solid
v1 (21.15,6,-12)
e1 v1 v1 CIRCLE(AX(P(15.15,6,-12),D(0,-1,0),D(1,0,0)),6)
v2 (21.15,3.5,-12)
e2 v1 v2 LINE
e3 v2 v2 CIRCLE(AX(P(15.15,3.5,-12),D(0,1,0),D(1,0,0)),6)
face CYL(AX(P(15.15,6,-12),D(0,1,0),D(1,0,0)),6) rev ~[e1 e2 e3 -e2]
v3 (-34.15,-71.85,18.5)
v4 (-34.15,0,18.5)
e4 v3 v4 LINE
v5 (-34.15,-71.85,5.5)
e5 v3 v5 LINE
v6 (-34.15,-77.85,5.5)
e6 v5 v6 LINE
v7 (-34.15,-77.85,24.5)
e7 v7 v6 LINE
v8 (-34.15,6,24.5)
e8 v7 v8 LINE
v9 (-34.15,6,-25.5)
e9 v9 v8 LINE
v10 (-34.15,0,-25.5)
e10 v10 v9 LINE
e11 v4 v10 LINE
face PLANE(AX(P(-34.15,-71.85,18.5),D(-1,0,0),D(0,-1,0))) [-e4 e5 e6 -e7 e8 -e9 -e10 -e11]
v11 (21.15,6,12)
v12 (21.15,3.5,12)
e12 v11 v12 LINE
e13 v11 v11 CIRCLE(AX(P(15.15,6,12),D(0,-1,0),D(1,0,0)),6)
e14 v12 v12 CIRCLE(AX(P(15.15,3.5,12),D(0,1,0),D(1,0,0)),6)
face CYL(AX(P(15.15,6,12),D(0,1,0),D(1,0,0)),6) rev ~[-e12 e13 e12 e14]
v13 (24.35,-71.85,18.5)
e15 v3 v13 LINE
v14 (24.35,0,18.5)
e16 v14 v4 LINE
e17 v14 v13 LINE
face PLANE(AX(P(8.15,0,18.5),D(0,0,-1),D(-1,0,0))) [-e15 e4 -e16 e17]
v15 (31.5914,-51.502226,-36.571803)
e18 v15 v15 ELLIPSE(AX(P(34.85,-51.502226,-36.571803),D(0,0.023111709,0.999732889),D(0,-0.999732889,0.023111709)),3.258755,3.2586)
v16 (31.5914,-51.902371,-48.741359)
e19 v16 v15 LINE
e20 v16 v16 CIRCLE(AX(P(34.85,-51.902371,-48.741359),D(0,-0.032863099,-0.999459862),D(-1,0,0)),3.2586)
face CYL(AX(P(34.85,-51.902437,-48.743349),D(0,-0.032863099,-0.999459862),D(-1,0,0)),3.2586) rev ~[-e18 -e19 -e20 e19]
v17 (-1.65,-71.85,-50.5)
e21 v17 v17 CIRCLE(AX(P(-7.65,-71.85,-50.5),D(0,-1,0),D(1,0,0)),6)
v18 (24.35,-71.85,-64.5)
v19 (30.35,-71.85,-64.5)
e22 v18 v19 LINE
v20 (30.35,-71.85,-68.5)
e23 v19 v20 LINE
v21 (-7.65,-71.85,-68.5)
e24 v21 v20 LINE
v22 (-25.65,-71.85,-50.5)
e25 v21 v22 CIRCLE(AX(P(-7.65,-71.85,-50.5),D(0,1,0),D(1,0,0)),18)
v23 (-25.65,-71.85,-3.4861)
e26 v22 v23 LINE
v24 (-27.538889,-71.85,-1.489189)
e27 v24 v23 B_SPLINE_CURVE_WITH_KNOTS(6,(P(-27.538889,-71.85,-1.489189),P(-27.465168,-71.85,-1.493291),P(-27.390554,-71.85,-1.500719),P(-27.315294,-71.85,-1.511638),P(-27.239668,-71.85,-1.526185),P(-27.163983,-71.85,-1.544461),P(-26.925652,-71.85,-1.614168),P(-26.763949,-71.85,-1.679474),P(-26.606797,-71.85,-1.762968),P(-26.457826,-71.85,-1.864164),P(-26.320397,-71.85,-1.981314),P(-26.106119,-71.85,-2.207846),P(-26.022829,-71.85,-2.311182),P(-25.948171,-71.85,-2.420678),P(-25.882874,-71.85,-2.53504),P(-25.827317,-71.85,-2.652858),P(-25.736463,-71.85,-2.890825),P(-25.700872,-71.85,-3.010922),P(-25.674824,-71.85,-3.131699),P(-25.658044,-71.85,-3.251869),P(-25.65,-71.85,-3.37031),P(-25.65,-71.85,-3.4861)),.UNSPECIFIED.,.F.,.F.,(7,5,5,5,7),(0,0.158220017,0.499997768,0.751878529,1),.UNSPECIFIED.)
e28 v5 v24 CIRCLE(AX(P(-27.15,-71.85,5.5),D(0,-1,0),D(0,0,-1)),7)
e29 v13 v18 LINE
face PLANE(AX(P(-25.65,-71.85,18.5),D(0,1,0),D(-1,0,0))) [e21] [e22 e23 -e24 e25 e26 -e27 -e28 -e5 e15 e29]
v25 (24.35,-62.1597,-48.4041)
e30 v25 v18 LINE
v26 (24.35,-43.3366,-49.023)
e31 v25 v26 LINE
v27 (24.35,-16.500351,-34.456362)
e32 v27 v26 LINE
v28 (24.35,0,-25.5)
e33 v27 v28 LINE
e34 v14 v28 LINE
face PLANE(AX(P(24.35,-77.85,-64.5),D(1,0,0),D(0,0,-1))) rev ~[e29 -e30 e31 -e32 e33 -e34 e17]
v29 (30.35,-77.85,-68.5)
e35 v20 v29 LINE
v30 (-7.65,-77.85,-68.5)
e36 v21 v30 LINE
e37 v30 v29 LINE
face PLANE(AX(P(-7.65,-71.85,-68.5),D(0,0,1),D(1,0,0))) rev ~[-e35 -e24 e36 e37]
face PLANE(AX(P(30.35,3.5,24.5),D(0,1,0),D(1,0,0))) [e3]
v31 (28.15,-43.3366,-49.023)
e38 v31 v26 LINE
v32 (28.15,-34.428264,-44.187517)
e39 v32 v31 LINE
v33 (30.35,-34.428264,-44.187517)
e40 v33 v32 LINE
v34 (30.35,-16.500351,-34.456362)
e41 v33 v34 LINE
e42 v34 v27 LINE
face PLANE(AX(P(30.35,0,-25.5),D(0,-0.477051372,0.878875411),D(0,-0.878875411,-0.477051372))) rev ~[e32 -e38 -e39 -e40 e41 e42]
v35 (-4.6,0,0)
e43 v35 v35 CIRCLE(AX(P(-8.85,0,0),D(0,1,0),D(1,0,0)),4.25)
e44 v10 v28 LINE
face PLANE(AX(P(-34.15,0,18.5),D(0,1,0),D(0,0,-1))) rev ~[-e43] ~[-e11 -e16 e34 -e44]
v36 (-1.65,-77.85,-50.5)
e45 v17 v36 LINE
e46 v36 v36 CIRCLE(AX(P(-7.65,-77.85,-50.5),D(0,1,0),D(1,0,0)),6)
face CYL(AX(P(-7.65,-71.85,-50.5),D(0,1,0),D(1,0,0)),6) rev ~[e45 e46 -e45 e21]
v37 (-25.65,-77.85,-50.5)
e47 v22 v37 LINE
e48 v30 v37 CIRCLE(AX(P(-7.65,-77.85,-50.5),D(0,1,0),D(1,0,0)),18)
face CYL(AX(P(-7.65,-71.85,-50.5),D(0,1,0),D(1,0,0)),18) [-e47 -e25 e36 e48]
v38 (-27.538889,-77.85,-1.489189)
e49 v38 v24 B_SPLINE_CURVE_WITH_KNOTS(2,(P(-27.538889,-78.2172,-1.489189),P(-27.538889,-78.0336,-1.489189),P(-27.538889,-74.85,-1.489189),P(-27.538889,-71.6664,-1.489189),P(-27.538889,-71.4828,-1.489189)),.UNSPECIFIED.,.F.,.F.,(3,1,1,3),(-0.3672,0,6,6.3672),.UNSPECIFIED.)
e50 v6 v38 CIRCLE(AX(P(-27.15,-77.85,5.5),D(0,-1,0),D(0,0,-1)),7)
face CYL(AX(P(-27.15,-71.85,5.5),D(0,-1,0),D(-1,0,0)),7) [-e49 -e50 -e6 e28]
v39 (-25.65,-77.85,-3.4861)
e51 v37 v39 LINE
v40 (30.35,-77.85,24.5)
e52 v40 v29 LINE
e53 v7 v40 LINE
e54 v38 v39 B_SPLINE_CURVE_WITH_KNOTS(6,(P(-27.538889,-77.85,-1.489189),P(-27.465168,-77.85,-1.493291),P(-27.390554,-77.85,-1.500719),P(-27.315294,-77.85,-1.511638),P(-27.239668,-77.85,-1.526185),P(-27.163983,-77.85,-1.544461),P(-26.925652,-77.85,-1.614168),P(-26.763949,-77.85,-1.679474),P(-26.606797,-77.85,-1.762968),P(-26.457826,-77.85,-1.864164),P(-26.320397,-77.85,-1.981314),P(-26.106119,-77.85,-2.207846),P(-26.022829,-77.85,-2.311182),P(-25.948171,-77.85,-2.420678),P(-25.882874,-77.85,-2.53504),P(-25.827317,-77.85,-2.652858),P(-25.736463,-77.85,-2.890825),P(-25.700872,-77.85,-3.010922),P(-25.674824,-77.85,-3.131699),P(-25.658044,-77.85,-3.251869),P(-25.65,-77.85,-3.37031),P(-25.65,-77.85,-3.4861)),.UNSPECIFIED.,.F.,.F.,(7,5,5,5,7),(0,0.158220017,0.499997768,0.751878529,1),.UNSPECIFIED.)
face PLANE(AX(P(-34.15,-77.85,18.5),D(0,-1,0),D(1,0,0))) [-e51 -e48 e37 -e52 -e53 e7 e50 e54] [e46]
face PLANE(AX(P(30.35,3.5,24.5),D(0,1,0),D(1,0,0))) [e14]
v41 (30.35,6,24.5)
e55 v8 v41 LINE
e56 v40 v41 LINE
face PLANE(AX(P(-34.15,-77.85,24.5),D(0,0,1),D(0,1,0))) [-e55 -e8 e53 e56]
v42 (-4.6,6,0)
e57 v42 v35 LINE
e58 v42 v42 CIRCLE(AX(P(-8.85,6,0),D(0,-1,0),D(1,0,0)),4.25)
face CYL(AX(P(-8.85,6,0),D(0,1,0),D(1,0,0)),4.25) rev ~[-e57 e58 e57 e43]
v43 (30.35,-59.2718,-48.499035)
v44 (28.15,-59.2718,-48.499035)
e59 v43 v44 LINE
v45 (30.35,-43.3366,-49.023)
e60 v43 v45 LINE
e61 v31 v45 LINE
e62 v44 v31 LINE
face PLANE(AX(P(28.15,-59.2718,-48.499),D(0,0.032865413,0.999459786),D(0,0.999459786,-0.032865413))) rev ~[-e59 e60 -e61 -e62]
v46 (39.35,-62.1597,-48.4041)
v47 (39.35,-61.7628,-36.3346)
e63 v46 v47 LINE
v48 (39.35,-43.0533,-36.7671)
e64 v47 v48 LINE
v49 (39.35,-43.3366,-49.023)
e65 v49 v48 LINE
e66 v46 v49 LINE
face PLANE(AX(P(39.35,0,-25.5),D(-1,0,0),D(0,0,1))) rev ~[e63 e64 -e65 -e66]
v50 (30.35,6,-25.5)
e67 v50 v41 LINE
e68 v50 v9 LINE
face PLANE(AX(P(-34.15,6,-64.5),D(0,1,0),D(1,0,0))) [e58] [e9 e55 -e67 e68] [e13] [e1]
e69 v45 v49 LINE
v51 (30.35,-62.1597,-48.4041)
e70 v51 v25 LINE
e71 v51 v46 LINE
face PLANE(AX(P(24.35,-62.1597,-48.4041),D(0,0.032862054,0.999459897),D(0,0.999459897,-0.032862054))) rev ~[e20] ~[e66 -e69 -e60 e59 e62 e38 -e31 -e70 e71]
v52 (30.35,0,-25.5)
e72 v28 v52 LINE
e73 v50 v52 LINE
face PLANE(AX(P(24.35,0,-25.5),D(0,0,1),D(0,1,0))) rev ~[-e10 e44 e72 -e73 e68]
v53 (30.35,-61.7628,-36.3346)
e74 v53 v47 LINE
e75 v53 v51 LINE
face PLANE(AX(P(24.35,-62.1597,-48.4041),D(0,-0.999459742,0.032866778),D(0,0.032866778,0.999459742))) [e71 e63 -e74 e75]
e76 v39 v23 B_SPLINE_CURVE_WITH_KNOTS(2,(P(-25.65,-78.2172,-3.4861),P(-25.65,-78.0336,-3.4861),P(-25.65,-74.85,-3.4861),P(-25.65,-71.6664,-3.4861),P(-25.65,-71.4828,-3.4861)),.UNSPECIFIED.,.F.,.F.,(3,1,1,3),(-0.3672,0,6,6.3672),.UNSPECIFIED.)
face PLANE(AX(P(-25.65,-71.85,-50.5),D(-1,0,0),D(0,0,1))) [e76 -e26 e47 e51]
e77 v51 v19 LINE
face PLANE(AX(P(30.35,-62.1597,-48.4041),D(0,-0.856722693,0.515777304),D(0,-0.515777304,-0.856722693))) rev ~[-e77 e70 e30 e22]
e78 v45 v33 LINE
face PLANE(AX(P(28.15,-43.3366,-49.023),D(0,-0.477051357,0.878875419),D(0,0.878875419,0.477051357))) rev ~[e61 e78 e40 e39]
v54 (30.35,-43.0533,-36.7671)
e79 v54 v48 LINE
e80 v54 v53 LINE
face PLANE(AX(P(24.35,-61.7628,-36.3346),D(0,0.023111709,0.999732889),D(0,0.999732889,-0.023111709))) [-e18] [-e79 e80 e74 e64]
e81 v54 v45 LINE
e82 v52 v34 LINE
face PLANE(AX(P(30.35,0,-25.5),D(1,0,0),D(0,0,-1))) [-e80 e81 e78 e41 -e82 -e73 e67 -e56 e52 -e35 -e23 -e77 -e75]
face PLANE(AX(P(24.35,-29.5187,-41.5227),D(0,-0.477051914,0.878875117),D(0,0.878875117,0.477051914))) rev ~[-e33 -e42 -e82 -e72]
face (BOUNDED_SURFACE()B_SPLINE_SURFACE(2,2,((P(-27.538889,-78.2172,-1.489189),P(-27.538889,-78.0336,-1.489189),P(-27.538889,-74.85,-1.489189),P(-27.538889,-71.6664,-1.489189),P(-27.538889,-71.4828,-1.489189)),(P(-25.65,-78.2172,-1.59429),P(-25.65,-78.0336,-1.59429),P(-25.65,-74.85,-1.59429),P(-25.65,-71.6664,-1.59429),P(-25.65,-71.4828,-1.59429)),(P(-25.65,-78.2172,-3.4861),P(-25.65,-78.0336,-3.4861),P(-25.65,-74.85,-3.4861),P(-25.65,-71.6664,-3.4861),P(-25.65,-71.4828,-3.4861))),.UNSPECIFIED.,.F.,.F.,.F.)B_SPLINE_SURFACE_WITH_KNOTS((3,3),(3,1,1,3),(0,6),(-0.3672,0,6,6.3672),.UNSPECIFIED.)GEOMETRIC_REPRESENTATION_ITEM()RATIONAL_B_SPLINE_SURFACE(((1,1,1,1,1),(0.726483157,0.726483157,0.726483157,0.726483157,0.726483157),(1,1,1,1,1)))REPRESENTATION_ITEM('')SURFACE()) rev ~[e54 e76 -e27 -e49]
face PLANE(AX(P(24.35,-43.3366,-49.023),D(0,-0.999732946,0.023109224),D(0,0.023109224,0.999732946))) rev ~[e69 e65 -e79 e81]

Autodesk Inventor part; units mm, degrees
ref_plane "YZ Plane" through (0, 0, 0) normal (1, 0, 0) x (0, 1, 0)
ref_plane "XZ Plane" through (0, 0, 0) normal (0, 1, 0) x (-1, 0, 0)
ref_plane "XY Plane" through (0, 0, 0) normal (0, 0, 1) x (1, 0, 0)
sketch "Sketch1" plane through (0, 0, 0) normal (0, 1, 0) x (-1, 0, 0)
  line L0 (0, -25.5) -> (-34.15, -25.5)
  line L1 (-34.15, -25.5) -> (-34.15, 0)
  line L2 (-34.15, 0) -> (-34.15, 25.5)
  line L3 (-34.15, 25.5) -> (0, 25.5)
  line L4 (0, 25.5) -> (34.15, 25.5)
  line L5 (34.15, 25.5) -> (34.15, 0)
  line L6 (34.15, 0) -> (34.15, -25.5)
  line L7 (34.15, -25.5) -> (0, -25.5)
  point P0 (0, 0)
extrude "Extrusion1" add sketch "Sketch1" along normal blind 7
sketch "Sketch3" plane through (-34.15, 0, 25.5) normal (0, 0, 1) x (1, 0, 0)
  line L0 (0, 0) -> (0, -78.85)
  point P0 (34.15, 0)
  dimension "d7" = 78.85
sketch "Sketch4" plane through (-34.15, 0, -25.5) normal (-1, 0, 0) x (0, 0, 1)
  line L0 (51, 0) -> (51, -78.85)
  line L1 (51, -78.85) -> (-39, -78.85)
  line L2 (-39, -78.85) -> (-39, -71.85)
  line L3 (0, 0) -> (-39, -71.85)
  line L4 (0, 0) -> (51, 0)
  point P0 (25.5, 0)
  dimension "d10" = 90
  dimension "d11" = 7
extrude "Extrusion2" add sketch "Sketch4" against normal blind 7
sketch "Sketch7" plane through (-27.15, 0, -25.5) normal (1, 0, 0) x (0, 0, -1)
  line L0 (-51, -78.85) -> (39, -78.85) projected
  line L1 (-51, -78.85) -> (39, -78.85)
  line L2 (39, -78.85) -> (39, -71.85) projected
  line L3 (39, -78.85) -> (39, -71.85)
  line L4 (39, -71.85) -> (-51, -71.85)
  line L5 (-51, 0) -> (-51, -78.85) projected
  line L6 (-51, -78.85) -> (-51, -71.85)
  point P0 (-25.5, 0)
sketch "Sketch8" plane through (0, 0, 0) normal (0, -1, 0) x (1, 0, 0)
  circle A0 centre (8.15, 0) radius 5 projected
  line L0 (8.15, 18.5) -> (34.15, 18.5)
  line L1 (34.15, 25.5) -> (34.15, -25.5) projected
  line L2 (8.15, 25.5) -> (34.15, 25.5)
  line L3 (8.15, 25.5) -> (-27.15, 25.5)
  line L4 (-27.15, 25.5) -> (-27.15, -25.5) projected
  line L5 (8.15, 18.5) -> (-27.15, 18.5)
  line L6 (34.15, 25.5) -> (34.15, 18.5)
  line L7 (-27.15, 25.5) -> (-27.15, 18.5)
  point P0 (0, 0)
extrude "Extrusion6" add sketch "Sketch7" along normal blind 58.5
extrude "Extrusion7" add sketch "Sketch8" along normal blind 78.75 contours L5 L4 L3 L2 L1 L0
sketch "Sketch9" plane through (31.35, 0, -25.5) normal (1, 0, 0) x (0, 0, -1)
  line L0 (-51, -78.75) -> (-51, 7) projected
  line L1 (-44, 0) -> (-44, -71.85) projected
  line L2 (-51, -78.75) -> (-44, -78.75)
  line L3 (-44, -78.75) -> (-44, -71.85)
  line L4 (-44, -71.85) -> (-51, -71.85)
  line L5 (-51, -71.85) -> (-51, -78.75)
  point P0 (-25.5, 0)
extrude "Extrusion8" cut sketch "Sketch9" along normal blind 10
sketch "Sketch10" plane through (0, 7, 0) normal (0, 1, 0) x (1, 0, 0)
  point P0 (0, 0)
sketch "Boceto11" plane through (-34.15, -78.85, -64.5) normal (0, -1, 0) x (1, 0, 0)
  line L0 (0, 0) -> (65.5, 0) projected
  line L1 (65.5, 89.9985) -> (65.5, 0)
  line L2 (65.5, 0) -> (71.065, 0)
  line L3 (71.065, 0) -> (71.065, 89.9985)
  line L4 (71.065, 89.9985) -> (65.5, 89.9985)
  line L5 (65.5, 89.9985) -> (65.5, 95.8996)
  line L6 (65.5, 95.8996) -> (71.065, 89.9985)
  point P0 (34.15, 64.5)
extrude "Extrusión9" cut sketch "Boceto11" against normal blind 100
sketch "Boceto12" plane through (31.35, 0, -25.5) normal (1, 0, 0) x (0, 0, -1)
  line L0 (-44, 0) -> (-44, -71.85) projected
  line L1 (-44, 0) -> (-44, -71.85)
  line L2 (39, -71.85) -> (39, -78.85) projected
  line L3 (-44, -71.85) -> (39, -71.85)
  line L4 (-44, 0) -> (0, 0) projected
  line L5 (39, -71.85) -> (0, 0)
  line L6 (0, 0) -> (-44, 0)
  point P0 (-25.5, 0)
extrude "Extrusión10" add sketch "Boceto12" against normal blind 7
sketch "Boceto13" plane through (-34.15, 7, -25.5) normal (-1, 0, 0) x (0, 0, 1)
  line L0 (0, -7) -> (0, 0) projected
  line L1 (44, -7) -> (0, -7) projected
  line L2 (0, -7) -> (44, -7)
  line L3 (44, -78.85) -> (-39, -78.85) projected
  line L4 (44, -7) -> (44, -78.85)
  line L5 (44, -78.85) -> (-39, -78.85)
  line L6 (-39, -78.85) -> (0, -7)
  point P0 (25.5, -7)
extrude "Extrusión11" cut sketch "Boceto13" against normal blind 7
sketch "Boceto15" plane through (-34.15, 0, -25.5) normal (0, 0, -1) x (-1, 0, 0)
  point P0 (-34.15, 0)
sketch "Boceto19" plane through (-34.15, -78.85, -64.5) normal (0, -1, 0) x (1, 0, 0)
  line L0 (65.5, 90) -> (65.5, 0) projected
  line L1 (65.5, 0) -> (65.5, 40.9323)
  line L2 (81.7334, 40.9323) -> (65.5, 40.9323)
  line L3 (81.7334, 40.9323) -> (81.7334, 0)
  line L4 (81.7334, 0) -> (65.5, 0)
  point P0 (34.15, 64.5)
extrude "Extrusión17" cut sketch "Boceto19" against normal blind 100
sketch "Boceto20" plane through (24.35, 0, -25.5) normal (-1, 0, 0) x (0, 0, 1)
  line L0 (-29.1839, -53.7657) -> (-27.9516, -53.3206) projected
  line L1 (0, 0) -> (-39, -71.85) projected
  line L2 (-29.1839, -53.7657) -> (-27.8697, -51.3447)
  line L3 (-27.8697, -51.3447) -> (-27.9516, -53.3206) projected
  line L4 (-27.8697, -51.3447) -> (-27.9516, -53.3206)
  line L5 (-27.9516, -53.3206) -> (-29.1839, -53.7657)
  point P0 (25.5, 0)
extrude "Extrusión18" add sketch "Boceto20" against normal blind 7
sketch "Boceto21" plane through (24.35, 0, -25.5) normal (-1, 0, 0) x (0, 0, 1)
  point P0 (25.5, 0)
sketch "Boceto22" plane through (24.35, 0, -25.5) normal (-1, 0, 0) x (0, 0, 1)
  point P0 (25.5, 0)
sketch "Boceto24" plane through (31.35, 0, -25.5) normal (1, 0, 0) x (0, 0, -1)
  point P0 (-25.5, 0)
sketch "Boceto26" plane through (24.35, 0, -25.5) normal (-1, 0, 0) x (0, 0, 1)
  point P0 (25.5, 0)
sketch "Boceto27" plane through (31.35, 0, -25.5) normal (1, 0, 0) x (0, 0, -1)
  line L0 (-51, 7) -> (0, 7) projected
  line L1 (0, 7) -> (16.0227, 7)
  line L2 (16.0227, 7) -> (16.0227, -29.5187)
  line L3 (0, 0) -> (39, -71.85) projected
  line L4 (16.0227, -29.5187) -> (0, 0)
  line L5 (0, 0) -> (0, 7)
  point P0 (-25.5, 0)
extrude "Extrusión22" add sketch "Boceto27" against normal blind 7
sketch "Boceto28" plane through (24.35, 0, -25.5) normal (-1, 0, 0) x (0, 0, 1)
  line L0 (-16.0227, -29.5187) -> (-39, -71.85) projected
  line L1 (-16.0227, -29.5187) -> (0, 0)
  line L2 (0, 7) -> (-16.0227, 7) projected
  line L3 (0, 0) -> (0, 7)
  line L4 (0, 7) -> (-16.0227, 7)
  line L5 (-16.0227, 7) -> (-16.0227, -29.5187) projected
  line L6 (-16.0227, 7) -> (-16.0227, -29.5187)
  point P0 (25.5, 0)
extrude "Extrusión23" cut sketch "Boceto28" against normal blind 7
sketch "Boceto29" plane through (31.35, 0, -25.5) normal (1, 0, 0) x (0, 0, -1)
  point P0 (-25.5, 0)
sketch "Boceto31" plane through (-34.15, -78.85, -64.5) normal (0, 0, -1) x (-1, 0, 0)
  line L0 (0, 7) -> (0, 0) projected
  line L1 (0, 0) -> (0, 1)
  line L2 (0, 1) -> (-65.5, 1)
  line L3 (-65.5, 0) -> (-65.5, 85.85) projected
  line L4 (-65.5, 1) -> (-64.5, 1)
  line L5 (-64.5, 1) -> (-64.5, 85.85)
  line L6 (0, 85.85) -> (-65.5, 85.85) projected
  line L7 (-64.5, 85.85) -> (0, 85.85)
  line L8 (0, 85.85) -> (0, 84.85)
  line L9 (0, 0) -> (0, 85.85) projected
  line L10 (0, 84.85) -> (-64.5, 84.85)
  line L11 (-64.5, 85.85) -> (-65.5, 85.85)
  line L12 (0, 0) -> (-65.5, 0) projected
  line L13 (-65.5, 85.85) -> (-65.5, 0)
  line L14 (-65.5, 0) -> (0, 0)
  point P0 (-34.15, 78.85)
  dimension "d84" = 1
  dimension "d85" = 1
  dimension "d86" = 1
extrude "Extrusión26" cut sketch "Boceto31" against normal blind 1000 contours L0 L12 L3 L2 | L10 L5 L6 L8 | L2 L3 L6 L5
sketch "Boceto32" plane through (-34.15, -71.85, 18.5) normal (-1, 0, 0) x (0, 0, 1)
  line L0 (-83, -6) -> (7, -6) projected
  line L1 (7, -6) -> (6, -6)
  line L2 (6, -6) -> (6, 77.85)
  line L3 (7, 77.85) -> (-44, 77.85) projected
  line L4 (7, -6) -> (7, 77.85) projected
  line L5 (6, 77.85) -> (7, 77.85)
  line L6 (7, 77.85) -> (7, -6)
  point P0 (-18.5, 71.85)
  dimension "d89" = 1
extrude "Extrusión27" cut sketch "Boceto32" against normal blind 100
sketch "Boceto33" plane through (-34.15, 6, -25.5) normal (0, 1, 0) x (1, 0, 0)
  line L0 (0, 0) -> (0, -44) projected
  line L1 (0, 0) -> (0, -25.5)
  line L2 (0, -25.5) -> (25.3, -25.5)
  circle A0 centre (25.3, -25.5) radius 4.25
  point P0 (34.15, -25.5)
  dimension "d92" = 25.5
  dimension "d93" = 25.3
  dimension "d94" = 8.5
extrude "Extrusión28" cut sketch "Boceto33" against normal blind 10
sketch "Boceto34" plane through (30.35, -77.85, -64.5) normal (1, 0, 0) x (0, 0, -1)
  point P0 (-64.5, 77.85)
sketch "Boceto35" plane through (30.35, -77.85, -64.5) normal (1, 0, 0) x (0, 0, -1)
  circle A0 centre (-24.4828, 41.285) radius 2.6
  point P0 (-64.5, 77.85)
  dimension "d101" = 5.2
extrude "Extrusión29" cut sketch "Boceto35" against normal blind 10
sketch "Boceto36" plane through (30.35, -77.85, -64.5) normal (1, 0, 0) x (0, 0, -1)
  point P0 (-64.5, 77.85)
sketch "Boceto37" plane through (30.35, -77.85, -64.5) normal (1, 0, 0) x (0, 0, -1)
  line L0 (-39, 77.85) -> (0, 6) projected
  line L1 (-12.3437, 28.741) -> (-12.3437, 48.1268)
  line L2 (-12.3437, 48.1268) -> (-28.4038, 58.3285)
  line L3 (-12.3437, 28.741) -> (-28.4038, 58.3285)
  point P0 (-64.5, 77.85)
extrude "Extrusión30" add sketch "Boceto37" against normal blind 6
fillet "Empalme3" radius 10 3 edges at (27.35, -29.7232, -52.1563) (27.35, -49.109, -52.1563) (27.35, -19.5215, -36.0962)
sketch "Boceto38" plane through (30.35, -77.85, -64.5) normal (1, 0, 0) x (0, 0, -1)
  point P0 (-64.5, 77.85)
sketch "Boceto39" plane through (30.35, -77.85, -64.5) normal (1, 0, 0) x (0, 0, -1)
  line L0 (-6.8274, 18.5782) -> (-18.8698, 18.5782)
  line L1 (-18.8698, 18.5782) -> (-18.2969, 35.7502)
  line L2 (-18.2969, 35.7502) -> (-20.685, 39.2299)
  line L3 (-20.685, 39.2299) -> (-19.4909, 52.6668)
  line L4 (-26.2143, 56.9377) -> (-16.9818, 51.073) projected
  line L5 (-6.8274, 18.5782) -> (-5.5662, 48.0514)
  line L6 (-5.5662, 48.0514) -> (-19.4909, 52.6668)
  point P0 (-64.5, 77.85)
extrude "Extrusión31" cut sketch "Boceto39" against normal blind 2.2
fillet "Empalme4" radius 10 1 edges at (29.25, -25.1832, -45.0091)
sketch "Boceto40" plane through (24.35, 0, -25.5) normal (-1, 0, 0) x (0, 0, 1)
  line L0 (-26.6563, -35.218) -> (-26.6563, -46.57) projected
  line L1 (-26.6563, -35.218) -> (-24.0221, -30.4862) construction
  arc A0 (-12.7857, -20.9123) -> (-9.3588, -17.2419) centre (-18.1476, -12.4713) ccw projected
  line L2 (-24.0221, -30.4862) -> (-10.7107, -19.1566) construction
  spline S0 degree 2 poles (-26.6563, -35.218) (-24.0221, -30.4862) (-10.7107, -19.1566) knots 1 1 1 2 2 2
  line L3 (-26.6563, -35.218) -> (-10.7107, -35.218)
  line L4 (-10.7107, -35.218) -> (-10.7107, -19.1566)
  line L5 (-10.7107, -19.1566) -> (-26.6563, -19.1566)
  line L6 (-26.6563, -19.1566) -> (-26.6563, -35.218)
  point P0 (25.5, 0)
  point P1 (-10.7107, -19.1566)
extrude "Extrusión32" cut sketch "Boceto40" against normal blind 6 contours S0 L6 L5
fillet "Empalme5" radius 10 1 edges at (26.25, -35.218, -52.1563)
sketch "Boceto41" plane through (-34.15, -71.85, 18.5) normal (0, 1, 0) x (1, 0, 0)
  circle A0 centre (11.5, 71.5) radius 5 projected
  circle A1 centre (11.5, 71.5) radius 6
  line L0 (11.5, 71.5) -> (-12.5, 71.5)
  line L1 (-12.5, 71.5) -> (-12.5, 95.5)
  line L2 (-12.5, 95.5) -> (11.5, 95.5)
  line L3 (11.5, 95.5) -> (11.5, 71.5)
  line L4 (64.5, 76.1726) -> (64.5, 83) projected
  line L5 (64.5, 83) -> (64.5, 95.5)
  line L6 (64.5, 95.5) -> (11.5, 95.5)
  line L7 (0, 83) -> (0, -6) projected
  line L8 (0, -6) -> (-12.5, -6)
  line L9 (-12.5, -6) -> (-12.5, 71.5)
  line L10 (64.5, 83) -> (11.5, 83)
  line L11 (0, 83) -> (58.5, 83) projected
  point P0 (34.15, 18.5)
  dimension "d113" = 12
  dimension "d114" = 24
  dimension "d115" = 24
extrude "Extrusión33" add sketch "Boceto41" against normal blind 6 contours L11 L7 L0 L1 L2 L3 | L3 L6 L5 L10 | L7 L8 L9 L0
sketch "Boceto43" plane through (30.35, 6, 24.5) normal (0, 1, 0) x (1, 0, 0)
  circle A0 centre (-39.2, 24.5) radius 4.25 projected
  line L0 (-39.2, 24.5) -> (-15.2, 24.5)
  line L1 (-15.2, 24.5) -> (-15.2, 12.5)
  line L2 (-15.2, 12.5) -> (-15.2, 36.5)
  circle A1 centre (-15.2, 36.5) radius 6
  circle A2 centre (-15.2, 12.5) radius 6
  point P0 (-30.35, 24.5)
  dimension "d123" = 24
  dimension "d124" = 12
  dimension "d125" = 24
  dimension "d126" = 12
  dimension "d127" = 12
extrude "Extrusión35" cut sketch "Boceto43" against normal blind 2.5 contours A1 | A2
sketch "Boceto44" plane through (24.35, 0, -25.5) normal (-1, 0, 0) x (0, 0, 1)
  line L0 (0, 0) -> (-9.3588, -17.2419) projected
  line L1 (-9.3588, -17.2419) -> (-30.5215, -33.5874)
  line L2 (-30.5215, -33.5874) -> (-30.5215, -56.2301)
  line L3 (-27.8675, -51.3405) -> (-39, -71.85) projected
  arc A0 (-12.666, -20.8351) -> (-9.3588, -17.2419) centre (-18.1476, -12.4713) ccw projected
  line L4 (-30.5215, -56.2301) -> (-9.3588, -17.2419)
  point P0 (25.5, 0)
extrude "Extrusión36" add sketch "Boceto44" against normal blind 6
sketch "Boceto45" plane through (30.35, 0, -25.5) normal (1, 0, 0) x (0, 0, -1)
  line L0 (18.315, -38.6201) -> (18.6875, -34.4282) projected
  line L1 (18.6875, -34.4282) -> (19.9402, -25.4146)
  line L2 (9.3588, -17.2419) -> (30.5215, -33.5874) projected
  line L3 (30.5215, -56.2301) -> (30.5215, -33.5874) projected
  line L4 (19.9402, -25.4146) -> (30.5215, -33.5874)
  line L5 (30.5215, -33.5874) -> (32.1519, -59.2336)
  line L6 (30.5215, -56.2301) -> (39, -71.85) projected
  line L7 (32.1726, -59.2718) -> (20.1302, -59.2718) projected
  line L8 (32.1726, -59.2718) -> (18.315, -38.6201)
  point P0 (-25.5, 0)
extrude "Extrusión37" cut sketch "Boceto45" against normal blind 2.2 contours L0 L1 L2 L3 L6 L8
fillet "Empalme7" radius 4 3 edges at (26.25, -33.5874, -56.0215) (27.35, -17.2419, -34.8588) (26.25, -56.2301, -56.0215)
sketch "Boceto46" plane through (-34.15, -71.85, 18.5) normal (0, 1, 0) x (1, 0, 0)
  line L0 (-12.5, -6) -> (0, -6) projected
  line L1 (0, -6) -> (0, 95.5)
  line L2 (-12.5, 95.5) -> (64.5, 95.5) projected
  line L3 (0, 95.5) -> (-12.5, 95.5)
  line L4 (-12.5, 95.5) -> (-12.5, -6)
  line L5 (-12.5, -6) -> (0, -6)
  point P0 (34.15, 18.5)
extrude "Extrusión38" cut sketch "Boceto46" against normal blind 10
sketch "Boceto47" plane through (-34.15, -71.85, 18.5) normal (0, 1, 0) x (1, 0, 0)
  line L0 (0, 0) -> (0, -6) projected
  line L1 (0, 95.5) -> (26.5, 95.5)
  line L2 (26.5, 95.5) -> (26.5, 69)
  line L3 (26.5, 69) -> (0, 69)
  line L4 (0, 69) -> (0, 95.5)
  circle A0 centre (26.5, 69) radius 6
  point P0 (34.15, 18.5)
  dimension "d137" = 26.5
  dimension "d138" = 26.5
  dimension "d139" = 12
extrude "Extrusión39" cut sketch "Boceto47" against normal blind 10 contours A0 L3 L2 | L2 L3 A0
sketch "Sketch48" plane through (-34.15, -71.85, 18.5) normal (0, 1, 0) x (1, 0, 0)
  circle A0 centre (26.5, 69) radius 6 projected
  line L0 (29.7126, 74.0675) -> (26.5, 69)
  circle A1 centre (26.5, 69) radius 18
  line L1 (8.5, 69) -> (8.5, 0)
  line L2 (0, 0) -> (58.5, 0) projected
  line L3 (0, 0) -> (8.5, 0)
  line L4 (26.5, 87) -> (64.5, 87)
  line L5 (64.5, 83) -> (64.5, 95.5) projected
  line L6 (0, 0) -> (0, 95.5) projected
  line L7 (64.5, 95.5) -> (0, 95.5)
  line L8 (0, 95.5) -> (0, 0)
  point P0 (34.15, 18.5)
  dimension "d142" = 36
extrude "Extrusion40" cut sketch "Sketch48" against normal blind 10 contours A1 L1 L2 L6 L7 L5 L4
sketch "Sketch49" plane through (24.35, 0, 18.5) normal (0, 0, -1) x (-1, 0, 0)
  line L0 (58.5, -77.85) -> (50, -77.85) projected
  line L1 (58.5, -77.85) -> (50, -77.85)
  line L2 (50, -71.85) -> (0, -71.85) projected
  line L3 (50, -77.85) -> (50, -71.85)
  line L4 (50, -71.85) -> (58.5, -71.85)
  line L5 (58.5, -71.85) -> (58.5, -77.85)
  point P0 (24.35, 0)
extrude "Extrusion41" add sketch "Sketch49" along normal blind 20
fillet "Fillet8" radius 7 1 edges at (-34.15, -74.85, -1.5)
fillet "Fillet9" radius 2 1 edges at (-25.65, -74.85, -1.5)
sketch "Sketch50" plane through (28.15, -77.85, -64.5) normal (1, 0, 0) x (0, 0, -1)
  point P0 (-64.5, 77.85)
sketch "Sketch51" plane through (-34.15, -77.85, 24.5) normal (0, -1, 0) x (1, 0, 0)
  line L0 (64.5, -50) -> (64.5, 0) projected
  line L1 (64.5, 0) -> (-39.5, 0)
  line L2 (-39.5, 0) -> (-39.5, -120)
  line L3 (-39.5, -120) -> (64.5, -120)
  line L4 (64.5, -120) -> (64.5, 0)
  point P0 (34.15, -24.5)
  dimension "d149" = 104
  dimension "d150" = 120
sketch "Sketch52" plane through (30.35, 0, -25.5) normal (1, 0, 0) x (0, 0, -1)
  line L0 (0, 0) -> (-44, 0) projected
  line L1 (32.1726, -59.2718) -> (39, -71.85) projected
  line L2 (0, 0) -> (39, -71.85)
  line L3 (22.9041, -62.1597) -> (23.523, -43.3366)
  line L4 (22.9041, -62.1597) -> (39, -71.85)
  line L5 (39, -71.85) -> (32.1726, -12.8018)
  line L6 (0, 0) -> (0, 6) projected
  line L7 (32.1726, -12.8018) -> (0, 0)
  point P0 (-25.5, 0)
extrude "Extrusion42" cut sketch "Sketch52" against normal blind 10
sketch "Sketch53" plane through (28.15, -77.85, -64.5) normal (1, 0, 0) x (0, 0, -1)
  line L0 (-16.0959, 15.6903) -> (0, 6) projected
  line L1 (-16.001, 18.5782) -> (-15.477, 34.5134) projected
  line L2 (-16.0959, 15.6903) -> (-15.477, 34.5134)
  line L3 (-15.477, 34.5134) -> (-20.7531, 44.2336)
  line L4 (-39, 77.85) -> (-15.477, 34.5134) projected
  line L5 (-20.7531, 44.2336) -> (-21.8828, 18.4708)
  line L6 (-21.8828, 18.4708) -> (-16.0045, 18.4708)
  point P0 (-64.5, 77.85)
extrude "Extrusion43" add sketch "Sketch53" along normal blind 2.2
sketch "Sketch54" plane through (30.35, 0, -25.5) normal (1, 0, 0) x (0, 0, -1)
  circle A0 centre (14.5172, -36.565) radius 2.6 projected
  circle A1 centre (14.5172, -36.565) radius 2.6
  point P0 (-25.5, 0)
extrude "Extrusion44" add sketch "Sketch54" against normal blind 6
sketch "Sketch55" plane through (30.35, 0, -25.5) normal (1, 0, 0) x (0, 0, -1)
  line L0 (39, -71.85) -> (22.9041, -62.1597) projected
  line L1 (22.9041, -62.1597) -> (13.9423, -61.864)
  line L2 (22.9041, -62.1597) -> (23.523, -43.3366) projected
  line L3 (19.528, -36.1291) -> (23.523, -43.3366)
  line L4 (22.9041, -62.1597) -> (23.523, -43.3366)
  line L5 (5.6191, -42.216) -> (13.9423, -61.864)
  line L6 (5.6191, -42.216) -> (19.528, -36.1291)
  point P0 (-25.5, 0)
sketch "Sketch56" plane through (24.35, 0, -25.5) normal (-1, 0, 0) x (0, 0, 1)
  line L0 (-22.9041, -62.1597) -> (-23.523, -43.3366) projected
  line L1 (-23.523, -43.3366) -> (-22.9041, -62.1597)
  line L2 (-22.9041, -62.1597) -> (-10.8346, -61.7628)
  line L3 (-10.8346, -61.7628) -> (-11.7615, -21.6683)
  line L4 (0, 0) -> (-23.523, -43.3366) projected
  line L5 (-23.523, -43.3366) -> (-11.2671, -43.0533)
  line L6 (-23.523, -43.3366) -> (-22.9041, -62.1597)
  line L7 (-22.9041, -62.1597) -> (-10.8346, -61.7628)
  line L8 (-10.8346, -61.7628) -> (-11.2671, -43.0533)
  line L9 (-11.2671, -43.0533) -> (-23.523, -43.3366)
  point P0 (25.5, 0)
extrude "Extrusion45" add sketch "Sketch56" against normal blind 15 contours L0 L5 L3 L2
sketch "Sketch57" plane through (39.35, -43.3366, -49.023) normal (0, -0.0328631, -0.9994599) x (-1, 0, 0)
  line L0 (0, -18.8333) -> (0, 0) projected
  line L1 (0, -8.5704) -> (9, -8.5704)
  line L2 (9, 46.8938) -> (9, -36.911) projected
  circle A0 centre (4.5, -8.5704) radius 3.2586
  point P0 (39.35, 41.7021)
extrude "Extrusion46" cut sketch "Sketch57" against normal blind 15
properties part number "AC23[i3][L]" material "Aluminio 6061"
